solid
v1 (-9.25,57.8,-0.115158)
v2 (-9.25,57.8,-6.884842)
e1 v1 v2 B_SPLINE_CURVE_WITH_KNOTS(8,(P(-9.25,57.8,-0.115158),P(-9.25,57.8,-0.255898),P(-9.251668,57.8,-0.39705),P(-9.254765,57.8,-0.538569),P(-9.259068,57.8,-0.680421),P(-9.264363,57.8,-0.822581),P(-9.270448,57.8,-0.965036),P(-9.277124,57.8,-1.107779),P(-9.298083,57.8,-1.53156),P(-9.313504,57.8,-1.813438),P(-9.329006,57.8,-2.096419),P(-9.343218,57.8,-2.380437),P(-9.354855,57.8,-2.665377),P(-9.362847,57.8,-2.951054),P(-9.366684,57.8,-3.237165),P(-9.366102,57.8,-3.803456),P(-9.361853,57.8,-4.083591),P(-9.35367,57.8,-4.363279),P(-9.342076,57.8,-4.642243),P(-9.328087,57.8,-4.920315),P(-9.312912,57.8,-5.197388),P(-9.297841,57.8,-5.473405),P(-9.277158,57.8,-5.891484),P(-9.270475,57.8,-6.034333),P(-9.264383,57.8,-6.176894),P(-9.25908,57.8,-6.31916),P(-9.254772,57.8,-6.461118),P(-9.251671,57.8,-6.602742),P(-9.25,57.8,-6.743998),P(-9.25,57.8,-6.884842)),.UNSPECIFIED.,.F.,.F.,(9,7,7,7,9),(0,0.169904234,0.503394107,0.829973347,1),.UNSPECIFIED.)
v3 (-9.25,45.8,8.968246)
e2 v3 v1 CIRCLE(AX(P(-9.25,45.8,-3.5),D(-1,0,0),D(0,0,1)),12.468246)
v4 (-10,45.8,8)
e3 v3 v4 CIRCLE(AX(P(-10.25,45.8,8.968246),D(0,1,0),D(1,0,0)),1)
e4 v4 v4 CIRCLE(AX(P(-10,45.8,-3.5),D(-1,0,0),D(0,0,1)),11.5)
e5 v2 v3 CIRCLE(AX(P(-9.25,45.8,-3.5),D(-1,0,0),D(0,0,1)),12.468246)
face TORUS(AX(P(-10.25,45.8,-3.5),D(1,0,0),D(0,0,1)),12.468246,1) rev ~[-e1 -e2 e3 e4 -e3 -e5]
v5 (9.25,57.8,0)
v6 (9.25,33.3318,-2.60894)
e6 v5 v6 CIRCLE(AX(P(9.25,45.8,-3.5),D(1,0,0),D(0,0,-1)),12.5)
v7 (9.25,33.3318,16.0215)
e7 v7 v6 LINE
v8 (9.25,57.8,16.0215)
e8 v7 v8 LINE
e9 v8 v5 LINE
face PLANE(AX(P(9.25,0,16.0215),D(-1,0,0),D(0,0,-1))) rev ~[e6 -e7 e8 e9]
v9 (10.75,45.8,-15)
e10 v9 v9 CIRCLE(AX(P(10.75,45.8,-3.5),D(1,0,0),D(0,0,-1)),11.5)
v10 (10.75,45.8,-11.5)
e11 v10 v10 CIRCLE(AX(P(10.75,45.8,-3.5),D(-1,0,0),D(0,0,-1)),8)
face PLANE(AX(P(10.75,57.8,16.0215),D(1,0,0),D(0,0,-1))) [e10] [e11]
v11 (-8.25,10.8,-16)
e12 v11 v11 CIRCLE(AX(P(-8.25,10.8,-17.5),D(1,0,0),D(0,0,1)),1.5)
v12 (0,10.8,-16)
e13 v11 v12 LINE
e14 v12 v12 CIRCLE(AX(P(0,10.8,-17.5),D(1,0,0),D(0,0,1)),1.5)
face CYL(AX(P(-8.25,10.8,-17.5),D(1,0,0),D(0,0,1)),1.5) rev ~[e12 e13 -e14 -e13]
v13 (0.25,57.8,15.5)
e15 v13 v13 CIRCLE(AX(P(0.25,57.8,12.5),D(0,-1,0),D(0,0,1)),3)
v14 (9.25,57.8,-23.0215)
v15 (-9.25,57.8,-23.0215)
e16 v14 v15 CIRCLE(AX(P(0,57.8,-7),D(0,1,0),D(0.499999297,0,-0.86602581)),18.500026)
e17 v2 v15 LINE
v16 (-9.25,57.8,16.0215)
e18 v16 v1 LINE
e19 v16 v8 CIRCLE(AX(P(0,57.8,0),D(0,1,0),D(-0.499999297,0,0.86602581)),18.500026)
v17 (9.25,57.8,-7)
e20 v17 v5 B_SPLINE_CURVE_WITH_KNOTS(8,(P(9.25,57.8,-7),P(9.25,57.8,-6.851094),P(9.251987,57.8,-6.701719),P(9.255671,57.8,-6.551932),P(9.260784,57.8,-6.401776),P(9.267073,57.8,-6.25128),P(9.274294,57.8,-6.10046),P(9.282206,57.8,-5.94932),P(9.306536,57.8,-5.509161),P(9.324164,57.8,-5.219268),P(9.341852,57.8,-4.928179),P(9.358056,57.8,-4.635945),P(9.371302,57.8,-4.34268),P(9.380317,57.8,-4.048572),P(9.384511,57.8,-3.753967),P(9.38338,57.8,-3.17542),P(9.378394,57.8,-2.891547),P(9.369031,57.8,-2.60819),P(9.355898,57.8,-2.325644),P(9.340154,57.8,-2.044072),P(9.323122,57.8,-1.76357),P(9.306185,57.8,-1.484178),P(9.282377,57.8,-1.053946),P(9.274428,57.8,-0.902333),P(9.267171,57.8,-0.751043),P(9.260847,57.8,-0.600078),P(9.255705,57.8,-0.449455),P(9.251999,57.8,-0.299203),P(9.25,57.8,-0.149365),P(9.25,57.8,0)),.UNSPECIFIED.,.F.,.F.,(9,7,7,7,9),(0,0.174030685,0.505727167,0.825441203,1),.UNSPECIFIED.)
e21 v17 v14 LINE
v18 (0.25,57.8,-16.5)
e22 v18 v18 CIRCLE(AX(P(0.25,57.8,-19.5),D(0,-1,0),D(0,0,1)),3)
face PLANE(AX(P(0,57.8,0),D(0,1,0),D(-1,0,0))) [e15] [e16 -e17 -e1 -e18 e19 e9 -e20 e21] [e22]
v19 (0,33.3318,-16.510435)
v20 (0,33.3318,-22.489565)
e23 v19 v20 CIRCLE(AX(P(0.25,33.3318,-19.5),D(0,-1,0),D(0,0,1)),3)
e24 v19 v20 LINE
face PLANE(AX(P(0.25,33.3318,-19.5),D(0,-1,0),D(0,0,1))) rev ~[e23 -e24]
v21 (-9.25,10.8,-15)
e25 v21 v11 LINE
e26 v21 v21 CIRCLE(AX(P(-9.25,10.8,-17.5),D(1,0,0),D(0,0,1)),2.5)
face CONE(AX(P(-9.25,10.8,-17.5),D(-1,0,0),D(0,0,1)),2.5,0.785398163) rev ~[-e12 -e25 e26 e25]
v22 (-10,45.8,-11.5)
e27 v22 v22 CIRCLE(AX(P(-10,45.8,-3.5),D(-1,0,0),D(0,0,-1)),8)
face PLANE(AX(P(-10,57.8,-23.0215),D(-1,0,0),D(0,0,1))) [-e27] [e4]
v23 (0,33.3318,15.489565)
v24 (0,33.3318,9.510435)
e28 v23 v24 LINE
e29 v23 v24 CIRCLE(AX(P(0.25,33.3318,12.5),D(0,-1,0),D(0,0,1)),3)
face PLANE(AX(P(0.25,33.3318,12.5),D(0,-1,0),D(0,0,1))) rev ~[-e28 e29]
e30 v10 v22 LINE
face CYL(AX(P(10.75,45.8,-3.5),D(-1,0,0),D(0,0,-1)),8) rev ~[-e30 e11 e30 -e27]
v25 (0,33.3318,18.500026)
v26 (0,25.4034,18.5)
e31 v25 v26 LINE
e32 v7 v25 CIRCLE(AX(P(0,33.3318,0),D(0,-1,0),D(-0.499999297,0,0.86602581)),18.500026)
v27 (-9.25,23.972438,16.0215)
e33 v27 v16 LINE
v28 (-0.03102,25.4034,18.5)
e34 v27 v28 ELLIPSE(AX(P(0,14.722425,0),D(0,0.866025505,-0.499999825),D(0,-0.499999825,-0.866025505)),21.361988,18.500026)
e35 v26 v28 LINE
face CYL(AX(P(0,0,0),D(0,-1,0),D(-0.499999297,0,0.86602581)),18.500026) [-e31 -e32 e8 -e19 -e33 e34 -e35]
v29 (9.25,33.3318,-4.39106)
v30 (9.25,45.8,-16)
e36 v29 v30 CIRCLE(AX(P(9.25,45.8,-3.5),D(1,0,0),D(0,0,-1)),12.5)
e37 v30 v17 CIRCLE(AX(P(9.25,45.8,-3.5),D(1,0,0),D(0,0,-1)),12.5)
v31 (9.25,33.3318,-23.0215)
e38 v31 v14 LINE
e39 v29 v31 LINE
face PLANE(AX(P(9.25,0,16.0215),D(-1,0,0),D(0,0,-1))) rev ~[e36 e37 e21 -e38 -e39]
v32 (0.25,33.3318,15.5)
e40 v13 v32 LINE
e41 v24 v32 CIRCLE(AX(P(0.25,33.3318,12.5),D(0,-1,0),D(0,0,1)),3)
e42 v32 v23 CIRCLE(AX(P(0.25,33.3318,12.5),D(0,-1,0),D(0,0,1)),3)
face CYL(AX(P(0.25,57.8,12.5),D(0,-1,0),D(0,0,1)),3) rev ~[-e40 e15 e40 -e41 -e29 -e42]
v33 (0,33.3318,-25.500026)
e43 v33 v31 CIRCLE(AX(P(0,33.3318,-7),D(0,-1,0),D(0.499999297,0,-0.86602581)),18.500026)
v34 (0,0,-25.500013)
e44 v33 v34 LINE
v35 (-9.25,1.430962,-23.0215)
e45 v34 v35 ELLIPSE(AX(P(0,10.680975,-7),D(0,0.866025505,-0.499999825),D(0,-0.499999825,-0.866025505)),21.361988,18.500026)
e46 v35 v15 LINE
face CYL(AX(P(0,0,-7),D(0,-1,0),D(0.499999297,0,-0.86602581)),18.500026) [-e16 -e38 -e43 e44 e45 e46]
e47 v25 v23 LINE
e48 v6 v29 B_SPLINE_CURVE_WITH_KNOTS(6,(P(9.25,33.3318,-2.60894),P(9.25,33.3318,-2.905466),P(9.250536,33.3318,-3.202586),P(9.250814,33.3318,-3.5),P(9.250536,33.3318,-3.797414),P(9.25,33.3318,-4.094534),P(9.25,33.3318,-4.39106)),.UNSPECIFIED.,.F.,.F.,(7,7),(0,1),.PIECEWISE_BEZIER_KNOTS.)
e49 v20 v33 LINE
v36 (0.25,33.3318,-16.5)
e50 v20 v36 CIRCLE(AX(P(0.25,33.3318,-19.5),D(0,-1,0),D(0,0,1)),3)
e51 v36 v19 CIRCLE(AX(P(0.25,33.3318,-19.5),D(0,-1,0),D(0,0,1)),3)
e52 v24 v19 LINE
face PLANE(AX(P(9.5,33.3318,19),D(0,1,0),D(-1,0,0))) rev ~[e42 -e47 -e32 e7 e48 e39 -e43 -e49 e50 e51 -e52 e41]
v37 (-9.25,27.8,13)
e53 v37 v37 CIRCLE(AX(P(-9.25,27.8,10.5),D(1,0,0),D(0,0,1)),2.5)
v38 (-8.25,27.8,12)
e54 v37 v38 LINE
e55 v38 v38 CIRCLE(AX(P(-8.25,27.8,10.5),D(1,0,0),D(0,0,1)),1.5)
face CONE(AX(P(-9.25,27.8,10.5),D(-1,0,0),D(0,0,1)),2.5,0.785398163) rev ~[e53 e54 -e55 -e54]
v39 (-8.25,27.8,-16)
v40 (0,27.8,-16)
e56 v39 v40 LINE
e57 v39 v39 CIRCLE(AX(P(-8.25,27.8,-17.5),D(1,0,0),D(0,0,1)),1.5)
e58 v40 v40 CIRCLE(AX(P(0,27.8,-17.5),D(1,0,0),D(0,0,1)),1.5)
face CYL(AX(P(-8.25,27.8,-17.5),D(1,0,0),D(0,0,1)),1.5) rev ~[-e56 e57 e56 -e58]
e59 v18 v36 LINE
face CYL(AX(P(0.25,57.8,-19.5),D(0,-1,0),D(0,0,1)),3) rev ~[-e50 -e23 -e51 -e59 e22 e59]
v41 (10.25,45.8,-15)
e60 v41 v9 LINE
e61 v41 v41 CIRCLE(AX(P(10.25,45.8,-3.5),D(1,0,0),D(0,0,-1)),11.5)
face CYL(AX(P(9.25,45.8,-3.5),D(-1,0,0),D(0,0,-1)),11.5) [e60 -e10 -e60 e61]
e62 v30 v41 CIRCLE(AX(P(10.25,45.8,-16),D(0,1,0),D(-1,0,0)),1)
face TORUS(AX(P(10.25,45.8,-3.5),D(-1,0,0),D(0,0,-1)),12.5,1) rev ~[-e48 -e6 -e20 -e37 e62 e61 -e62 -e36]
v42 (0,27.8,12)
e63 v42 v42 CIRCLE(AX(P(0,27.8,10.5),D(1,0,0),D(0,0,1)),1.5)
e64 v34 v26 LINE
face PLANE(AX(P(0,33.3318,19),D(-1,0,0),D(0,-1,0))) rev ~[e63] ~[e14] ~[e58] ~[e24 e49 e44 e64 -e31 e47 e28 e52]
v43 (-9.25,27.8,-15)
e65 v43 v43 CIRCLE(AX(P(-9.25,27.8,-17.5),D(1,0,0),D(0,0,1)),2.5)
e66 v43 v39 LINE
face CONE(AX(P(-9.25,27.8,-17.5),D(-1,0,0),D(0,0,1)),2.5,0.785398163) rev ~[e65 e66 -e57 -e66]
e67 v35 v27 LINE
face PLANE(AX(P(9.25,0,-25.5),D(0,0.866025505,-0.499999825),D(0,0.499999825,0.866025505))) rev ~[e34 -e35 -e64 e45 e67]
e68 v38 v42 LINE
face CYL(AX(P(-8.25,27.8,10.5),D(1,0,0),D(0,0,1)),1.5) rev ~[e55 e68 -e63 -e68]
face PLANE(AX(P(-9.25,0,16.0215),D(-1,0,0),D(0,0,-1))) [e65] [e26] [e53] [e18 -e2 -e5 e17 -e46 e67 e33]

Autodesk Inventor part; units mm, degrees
sketch "Skizze1" plane through (0, 0, 0) normal (0, 1, 0) x (-1, 0, 0)
  line L0 (9.25, 16.0215) -> (9.25, -23.0215)
  line L1 (-9.25, 16.0215) -> (-9.25, -23.0215)
  arc A0 (-9.25, -23.0215) -> (9.25, -23.0215) centre (0, -7) ccw
  arc A1 (9.25, 16.0215) -> (-9.25, 16.0215) centre (0, 0) ccw
  line L2 (9.25, -3.5) -> (-9.25, -3.5) construction
  line L3 (0, 18.5) -> (0, -26.5698) construction
  point P0 (0, -25.5)
  dimension "d1" = 18.5
  dimension "d2" = 44
  dimension "d3" = 18.5
extrude "Extrusion1" add sketch "Skizze1" along normal blind 57.8
sketch "Skizze2" plane through (9.25, 0, 16.0215) normal (1, 0, 0) x (0, 0, -1)
  line L0 (0, 0) -> (-2.4785, 0) projected
  line L1 (41.5215, 0) -> (41.5215, 57.8) projected
  line L2 (0, 0) -> (39.0429, 0) projected
  line L3 (41.5215, 0) -> (39.0429, 0) projected
  line L4 (-2.4785, 0) -> (-2.4785, 57.8) projected
  line L5 (41.5215, 0) -> (-2.4785, 25.4034)
  point P0 (16.0215, 0)
  dimension "d143" = 60
extrude "Extrusion2" cut sketch "Skizze2" against normal up to surface (18.5 mm away)
ref_plane "Arbeitsebene1" through (0, 45.8, 0) normal (0, 1, 0) x (-1, 0, 0)
sketch "Skizze8" plane through (-9.25, 57.8, -23.0215) normal (-1, 0, 0) x (0, 0, 1)
  circle A0 centre (19.5215, -12) radius 11.5
  line L0 (0, 0) -> (39.0429, 0) projected
  point P0 (23.0215, -57.8)
  point P1 (19.5215, 0)
  dimension "d40" = 23
  dimension "d41" = 12
extrude "Extrusion5" add sketch "Skizze8" along normal mid plane 1.5
sketch "Skizze9" plane through (9.25, 57.8, 16.0215) normal (1, 0, 0) x (0, 0, -1)
  circle A0 centre (19.5215, -12) radius 11.5
  line L0 (0, 0) -> (39.0429, 0) projected
  point P0 (16.0215, -57.8)
  point P1 (19.5215, 0)
  dimension "d44" = 23
  dimension "d45" = 12
extrude "Extrusion6" add sketch "Skizze9" along normal blind 1.5
sketch "Skizze10" plane through (10.75, 45.8, -3.5) normal (1, 0, 0) x (0, 0, -1)
  circle A0 centre (0, 0) radius 11.5 projected
  point P0 (-3.5, -45.8)
hole "Bohrung4" at (10.75, 45.8, -3.5) direction (-1, 0, 0) diameter 16 depth 20.75
ref_plane "Arbeitsebene2" through (0, 45.8, 0) normal (0, 1, 0) x (-1, 0, 0)
split_face "Trennen2"
sketch "Skizze11" plane through (0, 57.8, 0) normal (0, 1, 0) x (1, 0, 0)
  line L0 (0, 0) -> (5.4139, 0) construction
  arc A0 (-9.25, -16.0215) -> (9.25, -16.0215) centre (0, 0) ccw projected
  line L1 (0, -18.5) -> (0, 25.5) construction
  arc A1 (9.25, 23.0215) -> (-9.25, 23.0215) centre (0, 7) ccw projected
  point P0 (0, -12.5)
  point P1 (0, 19.5)
  point P2 (0, 3.5)
  dimension "d67" = 16
  dimension "d68" = 32
ref_plane "Arbeitsebene3" through (0, 0, 0) normal (1, 0, 0) x (0, 1, 0)
fillet "Rundung1" radius 1 2 edges at (9.25, 45.8, 8) (-9.25, 45.8, -15)
sketch "Skizze17" plane through (0, 0, 0) normal (1, 0, 0) x (0, 1, 0)
  line L0 (0, -25.5) -> (45.8, -25.5) projected
  arc A0 (45.8, -11.5) -> (45.8, 4.5) centre (45.8, -3.5) ccw projected
  arc A1 (45.8, 4.5) -> (45.8, -11.5) centre (45.8, -3.5) ccw projected
  arc A2 (45.8, 4.5) -> (45.8, -11.5) centre (45.8, -3.5) ccw projected
  line L1 (57.8, -0.1152) -> (57.8, 16.0215) projected
  point P0 (0, 0)
  point P1 (68.19, 2.5)
  dimension "d112" = 10.39
  dimension "d113" = 6
ref_plane "Arbeitsebene8" through (0, 0, 19) normal (0, 0, 1) x (1, 0, 0)
sketch "Skizze22" plane through (0, 0, 19) normal (0, 0, 1) x (1, 0, 0)
  line L0 (-9.25, 45.8) -> (-9.25, 33.3318) projected
  line L1 (0, 0) -> (9.5, 0)
  line L2 (9.5, 0) -> (9.5, 33.3318)
  line L3 (9.5, 33.3318) -> (0, 33.3318)
  line L4 (0, 33.3318) -> (0, 0)
  dimension "d125" = 9.5
extrude "Extrusion8" cut sketch "Skizze22" against normal through all
sketch "Skizze25" plane through (-9.25, 1.431, -23.0215) normal (-1, 0, 0) x (0, 0, 1)
  line L0 (-2.4785, 31.9008) -> (-2.4785, -1.431) projected
  arc A0 (11.5215, 44.369) -> (27.5215, 44.369) centre (19.5215, 44.369) ccw projected
  arc A1 (27.5215, 44.369) -> (11.5215, 44.369) centre (19.5215, 44.369) ccw projected
  point P0 (23.0215, -1.431)
  point P1 (5.5215, 9.369)
  point P2 (5.5215, 26.369)
  point P3 (33.5215, 26.369)
  dimension "d144" = 10.8
  dimension "d145" = 14
  dimension "d146" = 17
  dimension "d147" = 14
hole "Bohrung11" at (-9.25, 10.8, -17.5) at (-9.25, 27.8, -17.5) at (-9.25, 27.8, 10.5) direction (1, 0, 0) diameter 3 depth 9.25 countersink diameter 5 countersink angle 90
sketch "Skizze26" plane through (0, 57.8, 0) normal (0, 1, 0) x (1, 0, 0)
  line L0 (0, 25.5) -> (0, -18.5) projected
  line L1 (-9.25, 23.0215) -> (-9.25, 6.8848) projected
  line L2 (-9.25, 0.1152) -> (-9.25, -16.0215) projected
  line L3 (9.25, 7) -> (9.25, 23.0215) projected
  line L4 (9.25, -16.0215) -> (9.25, 0) projected
  arc A0 (9.25, 23.0215) -> (-9.25, 23.0215) centre (0, 7) ccw projected
  arc A1 (-9.25, -16.0215) -> (9.25, -16.0215) centre (0, 0) ccw projected
  point P0 (0.25, 19.5)
  point P1 (0.25, -12.5)
  point P2 (0, 25.5)
  point P3 (0, -18.5)
  dimension "d155" = 9.5
  dimension "d156" = 9.5
  dimension "d157" = 6
  dimension "d158" = 6
hole "Bohrung12" at (0.25, 57.8, 12.5) at (0.25, 57.8, -19.5) direction (0, -1, 0) diameter 6 depth 24.4682
properties part number "1042"
